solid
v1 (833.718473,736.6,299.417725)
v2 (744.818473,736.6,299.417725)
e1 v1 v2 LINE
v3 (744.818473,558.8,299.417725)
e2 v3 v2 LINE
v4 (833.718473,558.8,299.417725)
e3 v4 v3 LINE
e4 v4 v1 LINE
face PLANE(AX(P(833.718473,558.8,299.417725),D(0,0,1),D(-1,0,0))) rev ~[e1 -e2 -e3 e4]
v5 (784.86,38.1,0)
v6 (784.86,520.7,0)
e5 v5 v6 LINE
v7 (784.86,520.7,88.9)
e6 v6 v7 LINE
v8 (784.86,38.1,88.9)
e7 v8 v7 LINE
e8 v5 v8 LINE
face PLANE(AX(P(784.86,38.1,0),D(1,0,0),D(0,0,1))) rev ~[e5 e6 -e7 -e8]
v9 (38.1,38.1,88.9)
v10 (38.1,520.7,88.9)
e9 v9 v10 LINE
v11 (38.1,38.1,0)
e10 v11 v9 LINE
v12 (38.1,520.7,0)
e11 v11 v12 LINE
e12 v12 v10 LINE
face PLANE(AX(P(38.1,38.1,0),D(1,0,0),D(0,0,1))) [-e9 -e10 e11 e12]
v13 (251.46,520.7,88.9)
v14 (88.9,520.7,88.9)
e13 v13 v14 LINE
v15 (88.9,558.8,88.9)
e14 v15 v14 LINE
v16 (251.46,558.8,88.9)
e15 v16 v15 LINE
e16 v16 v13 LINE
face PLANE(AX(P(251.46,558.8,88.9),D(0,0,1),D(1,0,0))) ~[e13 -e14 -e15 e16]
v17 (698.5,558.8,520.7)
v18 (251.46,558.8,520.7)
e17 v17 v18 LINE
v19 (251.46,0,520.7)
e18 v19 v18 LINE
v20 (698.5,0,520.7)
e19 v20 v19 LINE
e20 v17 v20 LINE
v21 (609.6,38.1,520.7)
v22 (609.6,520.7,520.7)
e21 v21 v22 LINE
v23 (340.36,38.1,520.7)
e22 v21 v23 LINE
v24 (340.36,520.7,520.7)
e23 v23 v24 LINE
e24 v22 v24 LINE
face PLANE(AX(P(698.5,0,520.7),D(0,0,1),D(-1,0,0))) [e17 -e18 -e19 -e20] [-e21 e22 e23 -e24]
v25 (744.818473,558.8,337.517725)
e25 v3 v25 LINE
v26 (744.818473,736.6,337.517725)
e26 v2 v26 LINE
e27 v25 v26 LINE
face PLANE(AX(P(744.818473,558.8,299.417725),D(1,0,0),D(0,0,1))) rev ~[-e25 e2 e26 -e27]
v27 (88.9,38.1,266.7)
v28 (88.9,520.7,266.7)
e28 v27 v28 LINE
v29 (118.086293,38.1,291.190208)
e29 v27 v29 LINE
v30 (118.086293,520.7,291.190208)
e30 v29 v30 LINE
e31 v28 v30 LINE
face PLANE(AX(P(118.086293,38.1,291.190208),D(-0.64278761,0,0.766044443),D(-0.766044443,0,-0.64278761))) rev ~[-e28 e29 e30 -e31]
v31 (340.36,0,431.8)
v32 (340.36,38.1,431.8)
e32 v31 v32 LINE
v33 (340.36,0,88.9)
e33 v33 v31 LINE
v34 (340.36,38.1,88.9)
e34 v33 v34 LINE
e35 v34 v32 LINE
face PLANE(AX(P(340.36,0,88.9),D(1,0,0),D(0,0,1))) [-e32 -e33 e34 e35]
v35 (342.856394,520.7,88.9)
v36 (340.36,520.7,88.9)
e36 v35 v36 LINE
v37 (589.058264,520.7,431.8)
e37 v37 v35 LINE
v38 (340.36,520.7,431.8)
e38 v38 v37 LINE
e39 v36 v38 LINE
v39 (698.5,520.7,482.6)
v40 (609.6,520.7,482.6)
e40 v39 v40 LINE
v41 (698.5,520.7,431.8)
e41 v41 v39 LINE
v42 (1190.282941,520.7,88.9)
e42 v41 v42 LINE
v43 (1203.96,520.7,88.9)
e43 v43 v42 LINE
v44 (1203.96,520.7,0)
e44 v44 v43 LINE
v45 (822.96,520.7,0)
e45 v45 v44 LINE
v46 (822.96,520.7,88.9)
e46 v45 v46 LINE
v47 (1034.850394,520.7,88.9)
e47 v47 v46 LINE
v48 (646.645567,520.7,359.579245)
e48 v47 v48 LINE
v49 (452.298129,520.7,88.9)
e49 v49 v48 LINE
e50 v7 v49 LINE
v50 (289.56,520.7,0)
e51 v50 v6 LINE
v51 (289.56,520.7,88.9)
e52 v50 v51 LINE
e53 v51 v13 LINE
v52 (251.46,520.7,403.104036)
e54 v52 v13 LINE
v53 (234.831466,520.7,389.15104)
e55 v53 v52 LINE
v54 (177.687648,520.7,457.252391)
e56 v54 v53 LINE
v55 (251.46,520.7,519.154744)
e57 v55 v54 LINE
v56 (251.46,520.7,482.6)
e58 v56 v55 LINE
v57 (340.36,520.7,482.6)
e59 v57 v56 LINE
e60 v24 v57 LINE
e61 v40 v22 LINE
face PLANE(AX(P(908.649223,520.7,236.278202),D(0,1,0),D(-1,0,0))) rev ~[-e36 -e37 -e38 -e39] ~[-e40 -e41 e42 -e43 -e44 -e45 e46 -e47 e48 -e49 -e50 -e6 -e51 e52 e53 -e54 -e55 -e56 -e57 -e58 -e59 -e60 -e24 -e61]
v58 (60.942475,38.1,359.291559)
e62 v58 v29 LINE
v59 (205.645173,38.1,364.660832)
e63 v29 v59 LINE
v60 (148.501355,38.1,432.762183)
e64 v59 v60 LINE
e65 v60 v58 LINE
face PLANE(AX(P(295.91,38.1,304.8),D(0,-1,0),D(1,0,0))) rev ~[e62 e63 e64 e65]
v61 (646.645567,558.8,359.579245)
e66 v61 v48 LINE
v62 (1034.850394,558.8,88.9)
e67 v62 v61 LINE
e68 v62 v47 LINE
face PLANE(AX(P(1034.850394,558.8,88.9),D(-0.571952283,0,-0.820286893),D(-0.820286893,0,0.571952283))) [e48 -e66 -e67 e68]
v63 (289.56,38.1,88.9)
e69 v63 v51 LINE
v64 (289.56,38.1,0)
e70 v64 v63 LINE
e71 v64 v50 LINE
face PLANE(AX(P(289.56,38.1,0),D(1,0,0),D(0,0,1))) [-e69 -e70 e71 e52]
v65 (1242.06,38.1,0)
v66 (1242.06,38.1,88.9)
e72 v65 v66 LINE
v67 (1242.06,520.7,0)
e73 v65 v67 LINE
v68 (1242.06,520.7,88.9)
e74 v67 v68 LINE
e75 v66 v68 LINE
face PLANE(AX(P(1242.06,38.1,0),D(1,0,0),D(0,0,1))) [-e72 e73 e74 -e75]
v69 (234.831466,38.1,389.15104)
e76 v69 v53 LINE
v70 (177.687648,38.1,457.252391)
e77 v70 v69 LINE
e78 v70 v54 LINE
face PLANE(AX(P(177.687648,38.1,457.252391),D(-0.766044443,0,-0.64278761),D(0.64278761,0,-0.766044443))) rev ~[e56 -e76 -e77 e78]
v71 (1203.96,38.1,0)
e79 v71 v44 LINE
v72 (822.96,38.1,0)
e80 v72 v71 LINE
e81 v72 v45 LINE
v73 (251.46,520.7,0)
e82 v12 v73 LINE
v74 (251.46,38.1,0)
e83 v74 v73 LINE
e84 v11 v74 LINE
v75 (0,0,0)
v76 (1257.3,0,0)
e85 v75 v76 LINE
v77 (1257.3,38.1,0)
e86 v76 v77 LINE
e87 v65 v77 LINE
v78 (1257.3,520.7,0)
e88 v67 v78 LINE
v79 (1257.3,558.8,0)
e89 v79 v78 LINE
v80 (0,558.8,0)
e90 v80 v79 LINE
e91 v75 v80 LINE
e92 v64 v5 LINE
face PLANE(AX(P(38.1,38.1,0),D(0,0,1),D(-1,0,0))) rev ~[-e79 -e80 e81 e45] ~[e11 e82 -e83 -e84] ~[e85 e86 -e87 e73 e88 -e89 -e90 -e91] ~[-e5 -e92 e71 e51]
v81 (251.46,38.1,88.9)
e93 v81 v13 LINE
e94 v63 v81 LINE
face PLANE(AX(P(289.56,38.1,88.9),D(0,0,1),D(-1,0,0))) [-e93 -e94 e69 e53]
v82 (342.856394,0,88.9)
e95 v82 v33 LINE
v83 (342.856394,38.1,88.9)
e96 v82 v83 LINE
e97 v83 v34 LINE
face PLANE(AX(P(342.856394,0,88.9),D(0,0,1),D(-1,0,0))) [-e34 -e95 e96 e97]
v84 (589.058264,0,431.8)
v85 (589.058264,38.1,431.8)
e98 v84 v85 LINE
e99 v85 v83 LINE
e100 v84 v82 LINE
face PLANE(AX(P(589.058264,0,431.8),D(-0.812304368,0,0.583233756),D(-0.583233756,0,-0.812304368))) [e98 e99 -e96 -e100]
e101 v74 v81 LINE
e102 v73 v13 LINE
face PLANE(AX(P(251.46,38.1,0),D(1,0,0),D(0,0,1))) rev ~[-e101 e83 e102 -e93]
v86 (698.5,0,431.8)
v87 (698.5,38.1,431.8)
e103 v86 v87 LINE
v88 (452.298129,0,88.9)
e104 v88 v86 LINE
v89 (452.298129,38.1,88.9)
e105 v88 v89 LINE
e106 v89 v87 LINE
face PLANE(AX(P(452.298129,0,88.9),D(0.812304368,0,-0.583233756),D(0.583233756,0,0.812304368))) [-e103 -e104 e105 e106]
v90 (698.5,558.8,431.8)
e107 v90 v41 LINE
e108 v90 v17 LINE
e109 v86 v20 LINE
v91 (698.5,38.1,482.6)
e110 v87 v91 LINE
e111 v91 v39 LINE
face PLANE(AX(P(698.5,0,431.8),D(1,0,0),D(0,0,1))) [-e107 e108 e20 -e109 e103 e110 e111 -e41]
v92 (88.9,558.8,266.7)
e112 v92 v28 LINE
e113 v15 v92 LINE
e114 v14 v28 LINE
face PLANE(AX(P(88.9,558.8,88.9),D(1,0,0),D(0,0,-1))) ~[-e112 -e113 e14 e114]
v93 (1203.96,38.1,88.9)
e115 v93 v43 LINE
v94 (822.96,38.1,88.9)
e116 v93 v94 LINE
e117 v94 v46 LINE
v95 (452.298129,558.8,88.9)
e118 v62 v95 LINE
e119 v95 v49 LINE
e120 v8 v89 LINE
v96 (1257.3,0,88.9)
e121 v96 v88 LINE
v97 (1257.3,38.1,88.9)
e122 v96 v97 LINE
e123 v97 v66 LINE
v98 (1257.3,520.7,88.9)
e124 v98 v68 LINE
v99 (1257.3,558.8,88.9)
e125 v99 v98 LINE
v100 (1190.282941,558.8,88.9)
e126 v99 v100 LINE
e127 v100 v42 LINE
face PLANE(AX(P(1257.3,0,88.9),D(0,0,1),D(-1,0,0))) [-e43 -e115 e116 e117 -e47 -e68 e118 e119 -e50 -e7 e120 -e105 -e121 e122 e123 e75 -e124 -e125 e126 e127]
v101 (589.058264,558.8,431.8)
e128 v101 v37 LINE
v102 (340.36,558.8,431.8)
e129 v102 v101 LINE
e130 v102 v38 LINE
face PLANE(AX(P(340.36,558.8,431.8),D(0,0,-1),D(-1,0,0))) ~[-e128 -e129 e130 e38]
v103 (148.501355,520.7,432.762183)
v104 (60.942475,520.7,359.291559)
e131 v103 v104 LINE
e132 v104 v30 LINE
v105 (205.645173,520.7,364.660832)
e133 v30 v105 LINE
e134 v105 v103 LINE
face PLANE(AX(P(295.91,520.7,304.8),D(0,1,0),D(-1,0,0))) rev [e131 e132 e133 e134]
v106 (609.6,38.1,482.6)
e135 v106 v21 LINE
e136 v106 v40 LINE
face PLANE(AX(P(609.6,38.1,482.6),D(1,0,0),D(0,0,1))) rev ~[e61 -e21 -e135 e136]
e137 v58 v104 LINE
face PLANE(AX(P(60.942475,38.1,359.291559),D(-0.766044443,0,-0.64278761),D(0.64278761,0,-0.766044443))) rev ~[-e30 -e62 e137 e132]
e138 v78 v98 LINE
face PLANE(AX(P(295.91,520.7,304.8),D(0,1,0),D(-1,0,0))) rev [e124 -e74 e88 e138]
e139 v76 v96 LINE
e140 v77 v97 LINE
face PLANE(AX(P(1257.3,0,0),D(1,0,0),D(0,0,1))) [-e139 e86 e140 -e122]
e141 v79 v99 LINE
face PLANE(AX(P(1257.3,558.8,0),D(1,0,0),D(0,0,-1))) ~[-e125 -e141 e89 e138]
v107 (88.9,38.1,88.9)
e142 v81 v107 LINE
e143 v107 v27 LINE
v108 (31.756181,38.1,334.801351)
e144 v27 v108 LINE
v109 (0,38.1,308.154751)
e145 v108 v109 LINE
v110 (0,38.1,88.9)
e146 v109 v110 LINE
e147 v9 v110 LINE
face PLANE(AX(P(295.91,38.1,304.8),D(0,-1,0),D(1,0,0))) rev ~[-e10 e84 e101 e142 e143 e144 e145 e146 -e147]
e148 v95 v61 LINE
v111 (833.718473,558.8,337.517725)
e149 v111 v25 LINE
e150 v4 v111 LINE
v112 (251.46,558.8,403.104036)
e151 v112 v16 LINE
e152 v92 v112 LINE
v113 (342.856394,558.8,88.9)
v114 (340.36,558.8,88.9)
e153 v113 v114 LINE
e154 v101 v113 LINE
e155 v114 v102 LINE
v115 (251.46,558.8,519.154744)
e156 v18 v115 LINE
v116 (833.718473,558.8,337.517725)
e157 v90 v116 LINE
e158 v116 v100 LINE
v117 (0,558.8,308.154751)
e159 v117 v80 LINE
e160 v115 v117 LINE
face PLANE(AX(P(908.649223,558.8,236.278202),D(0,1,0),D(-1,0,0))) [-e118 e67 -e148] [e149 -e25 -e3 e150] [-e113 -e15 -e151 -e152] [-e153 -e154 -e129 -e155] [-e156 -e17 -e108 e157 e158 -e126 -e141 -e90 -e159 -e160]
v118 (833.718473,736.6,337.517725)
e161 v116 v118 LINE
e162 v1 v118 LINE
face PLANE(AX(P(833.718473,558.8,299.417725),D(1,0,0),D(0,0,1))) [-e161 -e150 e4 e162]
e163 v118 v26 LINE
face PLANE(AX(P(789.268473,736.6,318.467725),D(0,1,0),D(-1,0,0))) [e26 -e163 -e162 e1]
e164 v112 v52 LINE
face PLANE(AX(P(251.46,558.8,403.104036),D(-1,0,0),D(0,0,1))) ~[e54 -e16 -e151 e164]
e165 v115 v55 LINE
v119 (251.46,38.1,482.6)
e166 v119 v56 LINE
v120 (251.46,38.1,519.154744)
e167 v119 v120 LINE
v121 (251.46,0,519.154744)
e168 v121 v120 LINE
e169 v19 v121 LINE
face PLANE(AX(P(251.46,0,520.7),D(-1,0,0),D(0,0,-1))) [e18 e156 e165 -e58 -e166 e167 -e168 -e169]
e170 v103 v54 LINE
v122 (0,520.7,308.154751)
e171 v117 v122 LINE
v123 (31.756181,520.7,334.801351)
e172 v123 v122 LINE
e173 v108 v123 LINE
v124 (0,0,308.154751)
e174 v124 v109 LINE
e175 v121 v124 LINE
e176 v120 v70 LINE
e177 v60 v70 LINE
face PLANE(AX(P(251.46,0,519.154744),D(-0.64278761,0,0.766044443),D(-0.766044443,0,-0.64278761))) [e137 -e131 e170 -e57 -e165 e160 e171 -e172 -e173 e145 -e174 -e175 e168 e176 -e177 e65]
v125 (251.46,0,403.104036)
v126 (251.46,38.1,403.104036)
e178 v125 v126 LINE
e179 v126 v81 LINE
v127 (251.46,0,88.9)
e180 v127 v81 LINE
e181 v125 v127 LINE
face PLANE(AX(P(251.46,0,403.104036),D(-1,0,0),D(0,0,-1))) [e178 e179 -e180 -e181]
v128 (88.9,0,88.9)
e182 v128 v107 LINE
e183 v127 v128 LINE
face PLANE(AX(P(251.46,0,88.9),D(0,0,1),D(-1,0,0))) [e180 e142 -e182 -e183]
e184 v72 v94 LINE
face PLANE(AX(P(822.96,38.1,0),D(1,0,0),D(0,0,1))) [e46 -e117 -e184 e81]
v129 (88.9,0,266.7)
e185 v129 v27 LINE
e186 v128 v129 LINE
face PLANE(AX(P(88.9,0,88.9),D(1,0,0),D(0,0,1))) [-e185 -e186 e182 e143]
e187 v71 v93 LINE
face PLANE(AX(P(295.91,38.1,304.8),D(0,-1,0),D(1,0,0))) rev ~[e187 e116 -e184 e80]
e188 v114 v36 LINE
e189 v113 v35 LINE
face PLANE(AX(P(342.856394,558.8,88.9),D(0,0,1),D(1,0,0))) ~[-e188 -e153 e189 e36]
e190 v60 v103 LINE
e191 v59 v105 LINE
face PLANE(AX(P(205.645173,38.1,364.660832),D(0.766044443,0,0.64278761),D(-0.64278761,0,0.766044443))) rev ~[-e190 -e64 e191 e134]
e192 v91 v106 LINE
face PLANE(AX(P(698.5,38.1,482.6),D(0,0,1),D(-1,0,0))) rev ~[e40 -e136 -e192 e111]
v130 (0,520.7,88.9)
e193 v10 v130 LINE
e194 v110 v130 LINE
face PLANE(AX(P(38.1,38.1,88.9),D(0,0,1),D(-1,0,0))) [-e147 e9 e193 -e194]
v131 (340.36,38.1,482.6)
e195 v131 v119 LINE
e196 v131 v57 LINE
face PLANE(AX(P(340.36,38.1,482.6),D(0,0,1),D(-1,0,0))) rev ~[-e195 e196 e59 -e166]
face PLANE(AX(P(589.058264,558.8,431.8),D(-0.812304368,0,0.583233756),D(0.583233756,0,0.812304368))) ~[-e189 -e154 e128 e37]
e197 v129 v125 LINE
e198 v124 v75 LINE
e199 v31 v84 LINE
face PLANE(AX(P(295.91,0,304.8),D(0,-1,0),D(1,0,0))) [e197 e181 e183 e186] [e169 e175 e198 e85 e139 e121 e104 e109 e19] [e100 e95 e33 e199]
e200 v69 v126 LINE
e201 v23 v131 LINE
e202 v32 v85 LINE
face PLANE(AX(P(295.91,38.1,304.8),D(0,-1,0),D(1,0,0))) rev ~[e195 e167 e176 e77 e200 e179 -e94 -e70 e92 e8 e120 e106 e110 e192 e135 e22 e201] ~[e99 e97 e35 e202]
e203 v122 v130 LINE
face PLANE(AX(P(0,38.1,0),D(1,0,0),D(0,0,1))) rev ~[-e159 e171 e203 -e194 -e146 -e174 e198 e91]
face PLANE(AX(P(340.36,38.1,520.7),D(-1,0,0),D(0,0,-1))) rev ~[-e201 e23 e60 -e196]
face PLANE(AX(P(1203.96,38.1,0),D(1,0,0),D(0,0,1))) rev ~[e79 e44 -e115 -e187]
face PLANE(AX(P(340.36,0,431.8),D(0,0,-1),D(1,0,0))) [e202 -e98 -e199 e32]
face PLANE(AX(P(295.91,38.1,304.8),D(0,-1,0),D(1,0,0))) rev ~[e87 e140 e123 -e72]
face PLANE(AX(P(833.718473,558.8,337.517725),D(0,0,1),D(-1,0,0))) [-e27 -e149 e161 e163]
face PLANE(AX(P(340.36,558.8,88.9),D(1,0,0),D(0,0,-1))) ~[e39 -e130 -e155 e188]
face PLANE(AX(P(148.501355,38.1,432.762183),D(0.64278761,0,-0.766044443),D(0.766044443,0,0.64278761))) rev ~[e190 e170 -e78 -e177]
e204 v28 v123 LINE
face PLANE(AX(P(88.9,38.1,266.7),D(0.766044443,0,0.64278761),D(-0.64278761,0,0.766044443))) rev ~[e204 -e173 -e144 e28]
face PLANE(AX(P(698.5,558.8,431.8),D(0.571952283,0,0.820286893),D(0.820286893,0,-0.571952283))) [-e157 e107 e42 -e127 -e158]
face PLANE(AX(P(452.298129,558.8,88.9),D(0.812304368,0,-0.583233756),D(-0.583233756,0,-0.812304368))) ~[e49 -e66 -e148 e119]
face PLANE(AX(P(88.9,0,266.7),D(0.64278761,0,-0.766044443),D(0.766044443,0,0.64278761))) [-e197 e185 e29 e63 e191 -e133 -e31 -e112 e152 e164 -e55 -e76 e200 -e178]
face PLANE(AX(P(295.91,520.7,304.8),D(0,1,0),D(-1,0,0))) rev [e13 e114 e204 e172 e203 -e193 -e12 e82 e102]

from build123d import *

# Parameters (mm, degrees)
F1_DEPTH = 38.1
F4_W     = 38.1
F4_H     = 88.9
F4_W_2   = 88.9
F4_H_2   = 38.1
F5_DEPTH = 482.6
F7_DEPTH = 38.1
F8_W     = 88.9
F8_H     = 38.1
F9_DEPTH = 177.8


# Not quite as in the source:
# - a feature names something its author has since deleted; it is built from what else it names


with BuildPart() as f1:
    # F0 (on Front) → F1 (new body)
    with BuildSketch(Plane.XZ):
        Polygon((251.46, 403.1040360442), (251.46, 88.9), (340.36, 88.9), (340.36, 431.8), (340.36, 520.7), (251.46, 520.7), (251.46, 519.1547440658), align=None)
        Polygon((0, 308.15475081), (0, 88.9), (88.9, 88.9), (88.9, 266.7), (251.46, 403.1040360442), (251.46, 519.1547440658), align=None)
        Polygon((0, 88.9), (0, 0), (1257.3, 0), (1257.3, 88.9), (452.2981294842, 88.9), (342.8563937201, 88.9), (340.36, 88.9), (251.46, 88.9), (88.9, 88.9), align=None)
        Polygon((673.1, 431.8), (698.5, 431.8), (698.5, 520.7), (340.36, 520.7), (340.36, 431.8), (589.0582642359, 431.8), align=None)
        Polygon((342.8563937201, 88.9), (452.2981294842, 88.9), (698.5, 431.8), (673.1, 431.8), (589.0582642359, 431.8), align=None)
    extrude(amount=-F1_DEPTH)


with BuildPart() as f3_1:
    # F3: instance of F1
    add(f1.part.mirror(Plane(origin=(466.9868832569, 279.4, 206.694910325), x_dir=(1, 0, 0), z_dir=(0, 1, 0))))


with BuildPart() as f1_1:
    add(f1.part)

    add(f3_1.part)  # F5 merges F3_1
    # F4 (on face) → F5 (join, through all)
    with BuildSketch(Plane(origin=(0, 38.1, 0), x_dir=(-1, 0, 0), z_dir=(0, 1, 0))):
        with Locations((-19.05, 44.45)):
            Rectangle(F4_W, F4_H)
        with Locations((-270.51, 44.45)):
            Rectangle(F4_W, F4_H)
        Polygon((-88.9, 266.7), (-31.7561814989, 334.8013509933), (-60.9424747817, 359.2915589223), (-118.0862932828, 291.1902079291), align=None)
        Polygon((-205.6451731313, 364.6608317162), (-148.5013546302, 432.7621827095), (-177.687647913, 457.2523906386), (-234.8314664142, 389.1510396453), align=None)
        with Locations((-803.91, 44.45)):
            Rectangle(F4_W, F4_H)
        Polygon((-251.46, 482.6), (-251.46, 519.1547440658), (-251.46, 520.7), (-340.36, 520.7), (-340.36, 482.6), align=None)
        with Locations((-1223.01, 44.45)):
            Rectangle(F4_W, F4_H)
        with Locations((-654.05, 501.65)):
            Rectangle(F4_W_2, F4_H_2)
    extrude(amount=F5_DEPTH)

    # F6 (on face) → F7 (join)
    with BuildSketch(Plane(origin=(0, 558.8, 0), x_dir=(-1, 0, 0), z_dir=(0, 1, 0))):
        Polygon((-646.6455672201, 359.5792448815), (-698.5, 431.8), (-1190.2829408646, 88.9), (-1034.85039393, 88.9), align=None)
    extrude(amount=-F7_DEPTH)

    # F8 (on face) → F9 (join)
    with BuildSketch(Plane(origin=(0, 558.8, 0), x_dir=(-1, 0, 0), z_dir=(0, 1, 0))):
        with Locations((-789.2684733582, 318.4677249113)):
            Rectangle(F8_W, F8_H)
    extrude(amount=F9_DEPTH)


solid = f1_1.part
